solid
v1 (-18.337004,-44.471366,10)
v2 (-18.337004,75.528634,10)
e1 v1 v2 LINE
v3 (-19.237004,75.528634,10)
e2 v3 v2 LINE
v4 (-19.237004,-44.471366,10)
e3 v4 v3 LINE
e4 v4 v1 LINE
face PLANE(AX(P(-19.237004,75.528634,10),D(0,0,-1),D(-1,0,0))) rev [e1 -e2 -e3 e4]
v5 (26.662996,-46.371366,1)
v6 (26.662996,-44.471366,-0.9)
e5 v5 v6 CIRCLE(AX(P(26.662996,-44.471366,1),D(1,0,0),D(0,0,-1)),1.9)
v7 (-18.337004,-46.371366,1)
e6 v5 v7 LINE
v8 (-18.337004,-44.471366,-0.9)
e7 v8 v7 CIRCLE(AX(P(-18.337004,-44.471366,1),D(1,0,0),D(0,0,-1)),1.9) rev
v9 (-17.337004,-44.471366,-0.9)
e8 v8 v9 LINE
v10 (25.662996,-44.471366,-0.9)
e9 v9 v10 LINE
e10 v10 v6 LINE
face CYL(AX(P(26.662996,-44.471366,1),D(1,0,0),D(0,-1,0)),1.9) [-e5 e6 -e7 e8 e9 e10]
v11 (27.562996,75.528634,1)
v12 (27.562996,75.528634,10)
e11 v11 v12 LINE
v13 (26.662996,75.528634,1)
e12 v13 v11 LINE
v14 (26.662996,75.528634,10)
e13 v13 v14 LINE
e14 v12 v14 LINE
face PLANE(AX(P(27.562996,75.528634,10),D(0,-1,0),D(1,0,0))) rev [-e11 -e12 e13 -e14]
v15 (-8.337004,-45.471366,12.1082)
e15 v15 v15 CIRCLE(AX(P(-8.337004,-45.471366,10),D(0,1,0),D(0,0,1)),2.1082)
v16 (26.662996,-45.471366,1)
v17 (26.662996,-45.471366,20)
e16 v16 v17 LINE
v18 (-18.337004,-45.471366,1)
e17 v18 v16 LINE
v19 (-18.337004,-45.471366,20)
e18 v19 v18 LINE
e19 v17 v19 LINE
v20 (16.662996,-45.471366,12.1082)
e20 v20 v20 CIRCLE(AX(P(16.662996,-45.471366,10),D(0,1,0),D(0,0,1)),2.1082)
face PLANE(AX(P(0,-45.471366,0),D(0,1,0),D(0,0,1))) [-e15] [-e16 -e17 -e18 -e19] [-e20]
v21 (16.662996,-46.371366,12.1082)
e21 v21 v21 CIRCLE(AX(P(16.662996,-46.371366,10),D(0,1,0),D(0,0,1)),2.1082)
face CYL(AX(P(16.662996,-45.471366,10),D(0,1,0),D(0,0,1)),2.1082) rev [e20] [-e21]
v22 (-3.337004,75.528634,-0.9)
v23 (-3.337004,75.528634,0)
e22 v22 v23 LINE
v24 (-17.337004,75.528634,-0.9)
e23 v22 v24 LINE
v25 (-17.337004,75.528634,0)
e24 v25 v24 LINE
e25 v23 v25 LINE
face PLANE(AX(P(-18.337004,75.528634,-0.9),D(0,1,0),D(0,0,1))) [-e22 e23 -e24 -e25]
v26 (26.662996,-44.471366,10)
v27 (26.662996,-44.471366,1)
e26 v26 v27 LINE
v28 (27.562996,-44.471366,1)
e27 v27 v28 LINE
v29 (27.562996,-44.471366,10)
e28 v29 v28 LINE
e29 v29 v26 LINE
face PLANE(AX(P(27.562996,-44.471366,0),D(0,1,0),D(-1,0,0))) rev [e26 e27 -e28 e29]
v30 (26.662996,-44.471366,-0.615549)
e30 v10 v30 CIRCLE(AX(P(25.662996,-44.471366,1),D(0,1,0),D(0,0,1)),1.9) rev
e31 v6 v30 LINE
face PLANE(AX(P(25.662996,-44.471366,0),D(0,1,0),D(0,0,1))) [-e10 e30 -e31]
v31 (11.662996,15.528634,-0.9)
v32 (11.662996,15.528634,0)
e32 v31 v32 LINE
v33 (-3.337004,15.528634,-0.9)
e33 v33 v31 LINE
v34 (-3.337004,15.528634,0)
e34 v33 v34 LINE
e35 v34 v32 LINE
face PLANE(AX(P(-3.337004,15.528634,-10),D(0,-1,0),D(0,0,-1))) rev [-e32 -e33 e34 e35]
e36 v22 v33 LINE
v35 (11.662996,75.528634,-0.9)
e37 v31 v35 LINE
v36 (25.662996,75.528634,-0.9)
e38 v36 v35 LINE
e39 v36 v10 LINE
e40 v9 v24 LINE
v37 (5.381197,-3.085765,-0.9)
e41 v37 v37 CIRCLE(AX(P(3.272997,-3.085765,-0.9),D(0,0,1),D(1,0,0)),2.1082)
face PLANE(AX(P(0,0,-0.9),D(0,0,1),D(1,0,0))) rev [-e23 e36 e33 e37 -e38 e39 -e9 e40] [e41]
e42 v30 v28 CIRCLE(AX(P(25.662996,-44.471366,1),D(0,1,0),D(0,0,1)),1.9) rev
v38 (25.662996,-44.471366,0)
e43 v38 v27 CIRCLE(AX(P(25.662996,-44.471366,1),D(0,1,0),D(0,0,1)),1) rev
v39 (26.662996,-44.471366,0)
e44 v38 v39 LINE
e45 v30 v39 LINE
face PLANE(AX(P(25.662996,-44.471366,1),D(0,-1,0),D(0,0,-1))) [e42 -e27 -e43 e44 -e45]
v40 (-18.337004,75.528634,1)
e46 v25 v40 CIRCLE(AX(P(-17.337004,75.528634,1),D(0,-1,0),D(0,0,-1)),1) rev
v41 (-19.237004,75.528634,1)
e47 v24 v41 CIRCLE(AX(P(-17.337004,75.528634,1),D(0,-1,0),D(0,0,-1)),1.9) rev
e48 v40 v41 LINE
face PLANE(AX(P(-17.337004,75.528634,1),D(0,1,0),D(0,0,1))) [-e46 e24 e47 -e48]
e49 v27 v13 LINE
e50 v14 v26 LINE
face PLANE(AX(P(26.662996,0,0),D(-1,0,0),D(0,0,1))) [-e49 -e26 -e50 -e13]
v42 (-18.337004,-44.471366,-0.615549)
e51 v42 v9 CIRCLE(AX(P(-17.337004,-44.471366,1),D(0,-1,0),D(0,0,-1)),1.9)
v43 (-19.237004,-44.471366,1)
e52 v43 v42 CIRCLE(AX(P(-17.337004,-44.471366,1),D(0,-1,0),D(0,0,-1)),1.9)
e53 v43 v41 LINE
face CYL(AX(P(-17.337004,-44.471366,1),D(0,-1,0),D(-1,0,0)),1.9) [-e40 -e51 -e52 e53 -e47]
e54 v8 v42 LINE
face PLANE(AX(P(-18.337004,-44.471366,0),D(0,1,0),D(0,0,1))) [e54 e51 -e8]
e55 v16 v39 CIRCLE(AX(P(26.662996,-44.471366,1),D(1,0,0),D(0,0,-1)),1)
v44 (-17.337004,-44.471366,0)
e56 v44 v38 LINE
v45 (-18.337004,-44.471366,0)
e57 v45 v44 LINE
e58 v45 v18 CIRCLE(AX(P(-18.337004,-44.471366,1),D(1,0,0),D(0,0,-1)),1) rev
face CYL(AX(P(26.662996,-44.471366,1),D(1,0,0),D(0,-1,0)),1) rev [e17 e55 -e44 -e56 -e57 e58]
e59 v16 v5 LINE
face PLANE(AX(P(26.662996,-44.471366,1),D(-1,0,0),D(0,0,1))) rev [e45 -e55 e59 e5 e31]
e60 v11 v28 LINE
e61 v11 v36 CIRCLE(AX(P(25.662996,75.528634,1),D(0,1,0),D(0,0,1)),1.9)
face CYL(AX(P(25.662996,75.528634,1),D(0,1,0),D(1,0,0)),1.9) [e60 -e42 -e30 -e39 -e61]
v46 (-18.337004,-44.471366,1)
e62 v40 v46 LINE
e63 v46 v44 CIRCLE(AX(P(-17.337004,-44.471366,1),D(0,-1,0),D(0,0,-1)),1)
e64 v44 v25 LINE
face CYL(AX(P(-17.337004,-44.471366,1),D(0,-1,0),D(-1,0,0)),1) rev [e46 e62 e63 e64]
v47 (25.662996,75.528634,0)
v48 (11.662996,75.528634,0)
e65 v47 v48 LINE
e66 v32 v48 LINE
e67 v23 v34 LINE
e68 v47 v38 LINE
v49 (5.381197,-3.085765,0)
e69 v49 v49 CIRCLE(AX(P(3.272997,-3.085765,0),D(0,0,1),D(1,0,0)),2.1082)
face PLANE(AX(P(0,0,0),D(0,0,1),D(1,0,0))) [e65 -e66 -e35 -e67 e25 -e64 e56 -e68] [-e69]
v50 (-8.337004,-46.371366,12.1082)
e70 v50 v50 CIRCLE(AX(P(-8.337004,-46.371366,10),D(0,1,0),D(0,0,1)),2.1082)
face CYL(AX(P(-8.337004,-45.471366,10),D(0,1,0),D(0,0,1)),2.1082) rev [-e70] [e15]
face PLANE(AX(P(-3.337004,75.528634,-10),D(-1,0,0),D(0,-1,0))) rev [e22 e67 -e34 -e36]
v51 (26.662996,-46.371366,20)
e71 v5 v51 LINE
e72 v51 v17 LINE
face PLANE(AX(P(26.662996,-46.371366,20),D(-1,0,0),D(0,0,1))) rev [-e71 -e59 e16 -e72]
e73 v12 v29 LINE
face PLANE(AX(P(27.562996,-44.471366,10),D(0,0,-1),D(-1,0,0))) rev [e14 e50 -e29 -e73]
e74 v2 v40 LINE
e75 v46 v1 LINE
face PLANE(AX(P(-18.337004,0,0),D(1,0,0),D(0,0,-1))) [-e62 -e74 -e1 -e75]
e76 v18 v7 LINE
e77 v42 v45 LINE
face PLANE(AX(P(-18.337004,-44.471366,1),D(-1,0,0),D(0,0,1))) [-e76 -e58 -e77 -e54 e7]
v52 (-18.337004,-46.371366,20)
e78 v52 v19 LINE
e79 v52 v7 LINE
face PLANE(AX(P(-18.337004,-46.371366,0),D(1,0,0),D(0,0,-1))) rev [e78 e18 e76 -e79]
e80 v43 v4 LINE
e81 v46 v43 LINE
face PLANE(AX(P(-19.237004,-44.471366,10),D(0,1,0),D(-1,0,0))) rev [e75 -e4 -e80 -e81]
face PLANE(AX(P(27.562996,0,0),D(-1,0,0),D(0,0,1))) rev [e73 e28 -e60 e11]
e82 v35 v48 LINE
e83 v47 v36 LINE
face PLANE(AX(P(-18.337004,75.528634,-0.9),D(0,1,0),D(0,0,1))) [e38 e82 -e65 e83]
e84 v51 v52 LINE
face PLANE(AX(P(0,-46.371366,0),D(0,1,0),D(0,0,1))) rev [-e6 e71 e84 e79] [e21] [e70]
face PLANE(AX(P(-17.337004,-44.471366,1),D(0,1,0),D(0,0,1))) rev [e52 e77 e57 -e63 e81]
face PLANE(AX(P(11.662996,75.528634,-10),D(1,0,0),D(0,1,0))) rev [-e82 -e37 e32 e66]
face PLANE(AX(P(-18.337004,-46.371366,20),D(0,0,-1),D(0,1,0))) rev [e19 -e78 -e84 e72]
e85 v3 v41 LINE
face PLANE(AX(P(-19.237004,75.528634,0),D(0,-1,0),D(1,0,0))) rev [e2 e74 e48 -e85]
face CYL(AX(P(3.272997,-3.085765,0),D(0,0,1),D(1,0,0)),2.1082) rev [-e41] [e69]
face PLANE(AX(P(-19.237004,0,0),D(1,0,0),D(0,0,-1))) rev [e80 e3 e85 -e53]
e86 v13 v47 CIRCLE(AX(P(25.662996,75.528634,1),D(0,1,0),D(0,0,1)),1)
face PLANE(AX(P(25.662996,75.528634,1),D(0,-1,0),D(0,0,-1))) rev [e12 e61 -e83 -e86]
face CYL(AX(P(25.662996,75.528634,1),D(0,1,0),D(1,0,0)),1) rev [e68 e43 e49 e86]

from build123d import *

# Parameters (mm, degrees)
SKETCH1_W                    = 45
SKETCH1_H                    = 120
BASE_FLANGE2_DEPTH           = 0.9
EDGE_FLANGE2_DEPTH           = 45
SKETCH17_W                   = 15
SKETCH17_H                   = 60
CUT_EXTRUDE1_DEPTH           = 10
EDGE_FLANGE4_STRIP_W         = 5.6
EDGE_FLANGE4_STRIP_H         = 0.9
EDGE_FLANGE4_STRIP_CUT_DEPTH = 120
EDGE_FLANGE4_DEPTH           = 120
EDGE_FLANGE5_STRIP_W         = 5.6
EDGE_FLANGE5_STRIP_H         = 0.9
EDGE_FLANGE5_STRIP_CUT_DEPTH = 120
EDGE_FLANGE5_DEPTH           = 120
F_19_0_166_DIAMETER_SLOT2_D  = 4.2164
F_19_0_166_DIAMETER_SLOT1_D  = 4.2164


# Sheet-metal steps are written as plain solids
with BuildPart() as part:
    # Sketch1 → Base-Flange2 (new body)
    with BuildSketch(Plane.XY):
        with Locations((4.162995595, 15.528634361)):
            Rectangle(SKETCH1_W, SKETCH1_H)
    extrude(amount=-BASE_FLANGE2_DEPTH)

    # Edge-Flange2 section (across the edge) → Edge-Flange2 (add)
    with BuildSketch(Plane(origin=(-18.337004405, -45.471365639, 0), x_dir=(0, 1, 0), z_dir=(1, 0, 0))):
        with BuildLine():
            Line((-0.9, 1), (-0.9, 20))
            Line((-0.9, 20), (0, 20))
            Line((0, 20), (0, 1))
            ThreePointArc((0, 1), (0.292893219, 0.292893219), (1, 0))
            Line((1, 0), (1, -0.9))
            ThreePointArc((1, -0.9), (-0.343502884, -0.343502884), (-0.9, 1))
        make_face()
    extrude(amount=EDGE_FLANGE2_DEPTH)

    # Sketch17 → Cut-Extrude1 (cut)
    with BuildSketch(Plane.XY):
        with Locations((4.162995595, 45.528634361)):
            Rectangle(SKETCH17_W, SKETCH17_H)
    extrude(amount=-CUT_EXTRUDE1_DEPTH, mode=Mode.SUBTRACT)

    # Edge-Flange4 strip (across the edge) → Edge-Flange4 strip cut (cut)
    with BuildSketch(Plane(origin=(-18.337004405, 75.528634361, 0), x_dir=(1, 0, 0), z_dir=(0, -1, 0))):
        with Locations((-1.8, -0.45)):
            Rectangle(EDGE_FLANGE4_STRIP_W, EDGE_FLANGE4_STRIP_H)
    extrude(amount=EDGE_FLANGE4_STRIP_CUT_DEPTH, mode=Mode.SUBTRACT)

    # Edge-Flange4 section (across the edge) → Edge-Flange4 (add)
    with BuildSketch(Plane(origin=(-18.337004405, 75.528634361, 0), x_dir=(1, 0, 0), z_dir=(0, -1, 0))):
        with BuildLine():
            Line((-0.9, 1), (-0.9, 10))
            Line((-0.9, 10), (0, 10))
            Line((0, 10), (0, 1))
            ThreePointArc((0, 1), (0.292893219, 0.292893219), (1, 0))
            Line((1, 0), (1, -0.9))
            ThreePointArc((1, -0.9), (-0.343502884, -0.343502884), (-0.9, 1))
        make_face()
    extrude(amount=EDGE_FLANGE4_DEPTH)

    # Edge-Flange5 strip (across the edge) → Edge-Flange5 strip cut (cut)
    with BuildSketch(Plane(origin=(26.662995595, -44.471365639, 0), x_dir=(-1, 0, 0), z_dir=(0, 1, 0))):
        with Locations((-1.8, -0.45)):
            Rectangle(EDGE_FLANGE5_STRIP_W, EDGE_FLANGE5_STRIP_H)
    extrude(amount=EDGE_FLANGE5_STRIP_CUT_DEPTH, mode=Mode.SUBTRACT)

    # Edge-Flange5 section (across the edge) → Edge-Flange5 (add)
    with BuildSketch(Plane(origin=(26.662995595, -44.471365639, 0), x_dir=(-1, 0, 0), z_dir=(0, 1, 0))):
        with BuildLine():
            Line((-0.9, 1), (-0.9, 10))
            Line((-0.9, 10), (0, 10))
            Line((0, 10), (0, 1))
            ThreePointArc((0, 1), (0.292893219, 0.292893219), (1, 0))
            Line((1, 0), (1, -0.9))
            ThreePointArc((1, -0.9), (-0.343502884, -0.343502884), (-0.9, 1))
        make_face()
    extrude(amount=EDGE_FLANGE5_DEPTH)

    # #19 (0.166) Diameter Slot2 (through all)
    with Locations(Plane(origin=(0, -45.471365639, 0), x_dir=(1, 0, 0), z_dir=(0, 1, 0))):
        with Locations((16.662995595, -10), (-8.337004405, -10)):
            Hole(F_19_0_166_DIAMETER_SLOT2_D / 2)

    # #19 (0.166) Diameter Slot1 (through all)
    with Locations(Plane.XY):
        with Locations((3.27299702, -3.085765259)):
            Hole(F_19_0_166_DIAMETER_SLOT1_D / 2)


solid = part.part
